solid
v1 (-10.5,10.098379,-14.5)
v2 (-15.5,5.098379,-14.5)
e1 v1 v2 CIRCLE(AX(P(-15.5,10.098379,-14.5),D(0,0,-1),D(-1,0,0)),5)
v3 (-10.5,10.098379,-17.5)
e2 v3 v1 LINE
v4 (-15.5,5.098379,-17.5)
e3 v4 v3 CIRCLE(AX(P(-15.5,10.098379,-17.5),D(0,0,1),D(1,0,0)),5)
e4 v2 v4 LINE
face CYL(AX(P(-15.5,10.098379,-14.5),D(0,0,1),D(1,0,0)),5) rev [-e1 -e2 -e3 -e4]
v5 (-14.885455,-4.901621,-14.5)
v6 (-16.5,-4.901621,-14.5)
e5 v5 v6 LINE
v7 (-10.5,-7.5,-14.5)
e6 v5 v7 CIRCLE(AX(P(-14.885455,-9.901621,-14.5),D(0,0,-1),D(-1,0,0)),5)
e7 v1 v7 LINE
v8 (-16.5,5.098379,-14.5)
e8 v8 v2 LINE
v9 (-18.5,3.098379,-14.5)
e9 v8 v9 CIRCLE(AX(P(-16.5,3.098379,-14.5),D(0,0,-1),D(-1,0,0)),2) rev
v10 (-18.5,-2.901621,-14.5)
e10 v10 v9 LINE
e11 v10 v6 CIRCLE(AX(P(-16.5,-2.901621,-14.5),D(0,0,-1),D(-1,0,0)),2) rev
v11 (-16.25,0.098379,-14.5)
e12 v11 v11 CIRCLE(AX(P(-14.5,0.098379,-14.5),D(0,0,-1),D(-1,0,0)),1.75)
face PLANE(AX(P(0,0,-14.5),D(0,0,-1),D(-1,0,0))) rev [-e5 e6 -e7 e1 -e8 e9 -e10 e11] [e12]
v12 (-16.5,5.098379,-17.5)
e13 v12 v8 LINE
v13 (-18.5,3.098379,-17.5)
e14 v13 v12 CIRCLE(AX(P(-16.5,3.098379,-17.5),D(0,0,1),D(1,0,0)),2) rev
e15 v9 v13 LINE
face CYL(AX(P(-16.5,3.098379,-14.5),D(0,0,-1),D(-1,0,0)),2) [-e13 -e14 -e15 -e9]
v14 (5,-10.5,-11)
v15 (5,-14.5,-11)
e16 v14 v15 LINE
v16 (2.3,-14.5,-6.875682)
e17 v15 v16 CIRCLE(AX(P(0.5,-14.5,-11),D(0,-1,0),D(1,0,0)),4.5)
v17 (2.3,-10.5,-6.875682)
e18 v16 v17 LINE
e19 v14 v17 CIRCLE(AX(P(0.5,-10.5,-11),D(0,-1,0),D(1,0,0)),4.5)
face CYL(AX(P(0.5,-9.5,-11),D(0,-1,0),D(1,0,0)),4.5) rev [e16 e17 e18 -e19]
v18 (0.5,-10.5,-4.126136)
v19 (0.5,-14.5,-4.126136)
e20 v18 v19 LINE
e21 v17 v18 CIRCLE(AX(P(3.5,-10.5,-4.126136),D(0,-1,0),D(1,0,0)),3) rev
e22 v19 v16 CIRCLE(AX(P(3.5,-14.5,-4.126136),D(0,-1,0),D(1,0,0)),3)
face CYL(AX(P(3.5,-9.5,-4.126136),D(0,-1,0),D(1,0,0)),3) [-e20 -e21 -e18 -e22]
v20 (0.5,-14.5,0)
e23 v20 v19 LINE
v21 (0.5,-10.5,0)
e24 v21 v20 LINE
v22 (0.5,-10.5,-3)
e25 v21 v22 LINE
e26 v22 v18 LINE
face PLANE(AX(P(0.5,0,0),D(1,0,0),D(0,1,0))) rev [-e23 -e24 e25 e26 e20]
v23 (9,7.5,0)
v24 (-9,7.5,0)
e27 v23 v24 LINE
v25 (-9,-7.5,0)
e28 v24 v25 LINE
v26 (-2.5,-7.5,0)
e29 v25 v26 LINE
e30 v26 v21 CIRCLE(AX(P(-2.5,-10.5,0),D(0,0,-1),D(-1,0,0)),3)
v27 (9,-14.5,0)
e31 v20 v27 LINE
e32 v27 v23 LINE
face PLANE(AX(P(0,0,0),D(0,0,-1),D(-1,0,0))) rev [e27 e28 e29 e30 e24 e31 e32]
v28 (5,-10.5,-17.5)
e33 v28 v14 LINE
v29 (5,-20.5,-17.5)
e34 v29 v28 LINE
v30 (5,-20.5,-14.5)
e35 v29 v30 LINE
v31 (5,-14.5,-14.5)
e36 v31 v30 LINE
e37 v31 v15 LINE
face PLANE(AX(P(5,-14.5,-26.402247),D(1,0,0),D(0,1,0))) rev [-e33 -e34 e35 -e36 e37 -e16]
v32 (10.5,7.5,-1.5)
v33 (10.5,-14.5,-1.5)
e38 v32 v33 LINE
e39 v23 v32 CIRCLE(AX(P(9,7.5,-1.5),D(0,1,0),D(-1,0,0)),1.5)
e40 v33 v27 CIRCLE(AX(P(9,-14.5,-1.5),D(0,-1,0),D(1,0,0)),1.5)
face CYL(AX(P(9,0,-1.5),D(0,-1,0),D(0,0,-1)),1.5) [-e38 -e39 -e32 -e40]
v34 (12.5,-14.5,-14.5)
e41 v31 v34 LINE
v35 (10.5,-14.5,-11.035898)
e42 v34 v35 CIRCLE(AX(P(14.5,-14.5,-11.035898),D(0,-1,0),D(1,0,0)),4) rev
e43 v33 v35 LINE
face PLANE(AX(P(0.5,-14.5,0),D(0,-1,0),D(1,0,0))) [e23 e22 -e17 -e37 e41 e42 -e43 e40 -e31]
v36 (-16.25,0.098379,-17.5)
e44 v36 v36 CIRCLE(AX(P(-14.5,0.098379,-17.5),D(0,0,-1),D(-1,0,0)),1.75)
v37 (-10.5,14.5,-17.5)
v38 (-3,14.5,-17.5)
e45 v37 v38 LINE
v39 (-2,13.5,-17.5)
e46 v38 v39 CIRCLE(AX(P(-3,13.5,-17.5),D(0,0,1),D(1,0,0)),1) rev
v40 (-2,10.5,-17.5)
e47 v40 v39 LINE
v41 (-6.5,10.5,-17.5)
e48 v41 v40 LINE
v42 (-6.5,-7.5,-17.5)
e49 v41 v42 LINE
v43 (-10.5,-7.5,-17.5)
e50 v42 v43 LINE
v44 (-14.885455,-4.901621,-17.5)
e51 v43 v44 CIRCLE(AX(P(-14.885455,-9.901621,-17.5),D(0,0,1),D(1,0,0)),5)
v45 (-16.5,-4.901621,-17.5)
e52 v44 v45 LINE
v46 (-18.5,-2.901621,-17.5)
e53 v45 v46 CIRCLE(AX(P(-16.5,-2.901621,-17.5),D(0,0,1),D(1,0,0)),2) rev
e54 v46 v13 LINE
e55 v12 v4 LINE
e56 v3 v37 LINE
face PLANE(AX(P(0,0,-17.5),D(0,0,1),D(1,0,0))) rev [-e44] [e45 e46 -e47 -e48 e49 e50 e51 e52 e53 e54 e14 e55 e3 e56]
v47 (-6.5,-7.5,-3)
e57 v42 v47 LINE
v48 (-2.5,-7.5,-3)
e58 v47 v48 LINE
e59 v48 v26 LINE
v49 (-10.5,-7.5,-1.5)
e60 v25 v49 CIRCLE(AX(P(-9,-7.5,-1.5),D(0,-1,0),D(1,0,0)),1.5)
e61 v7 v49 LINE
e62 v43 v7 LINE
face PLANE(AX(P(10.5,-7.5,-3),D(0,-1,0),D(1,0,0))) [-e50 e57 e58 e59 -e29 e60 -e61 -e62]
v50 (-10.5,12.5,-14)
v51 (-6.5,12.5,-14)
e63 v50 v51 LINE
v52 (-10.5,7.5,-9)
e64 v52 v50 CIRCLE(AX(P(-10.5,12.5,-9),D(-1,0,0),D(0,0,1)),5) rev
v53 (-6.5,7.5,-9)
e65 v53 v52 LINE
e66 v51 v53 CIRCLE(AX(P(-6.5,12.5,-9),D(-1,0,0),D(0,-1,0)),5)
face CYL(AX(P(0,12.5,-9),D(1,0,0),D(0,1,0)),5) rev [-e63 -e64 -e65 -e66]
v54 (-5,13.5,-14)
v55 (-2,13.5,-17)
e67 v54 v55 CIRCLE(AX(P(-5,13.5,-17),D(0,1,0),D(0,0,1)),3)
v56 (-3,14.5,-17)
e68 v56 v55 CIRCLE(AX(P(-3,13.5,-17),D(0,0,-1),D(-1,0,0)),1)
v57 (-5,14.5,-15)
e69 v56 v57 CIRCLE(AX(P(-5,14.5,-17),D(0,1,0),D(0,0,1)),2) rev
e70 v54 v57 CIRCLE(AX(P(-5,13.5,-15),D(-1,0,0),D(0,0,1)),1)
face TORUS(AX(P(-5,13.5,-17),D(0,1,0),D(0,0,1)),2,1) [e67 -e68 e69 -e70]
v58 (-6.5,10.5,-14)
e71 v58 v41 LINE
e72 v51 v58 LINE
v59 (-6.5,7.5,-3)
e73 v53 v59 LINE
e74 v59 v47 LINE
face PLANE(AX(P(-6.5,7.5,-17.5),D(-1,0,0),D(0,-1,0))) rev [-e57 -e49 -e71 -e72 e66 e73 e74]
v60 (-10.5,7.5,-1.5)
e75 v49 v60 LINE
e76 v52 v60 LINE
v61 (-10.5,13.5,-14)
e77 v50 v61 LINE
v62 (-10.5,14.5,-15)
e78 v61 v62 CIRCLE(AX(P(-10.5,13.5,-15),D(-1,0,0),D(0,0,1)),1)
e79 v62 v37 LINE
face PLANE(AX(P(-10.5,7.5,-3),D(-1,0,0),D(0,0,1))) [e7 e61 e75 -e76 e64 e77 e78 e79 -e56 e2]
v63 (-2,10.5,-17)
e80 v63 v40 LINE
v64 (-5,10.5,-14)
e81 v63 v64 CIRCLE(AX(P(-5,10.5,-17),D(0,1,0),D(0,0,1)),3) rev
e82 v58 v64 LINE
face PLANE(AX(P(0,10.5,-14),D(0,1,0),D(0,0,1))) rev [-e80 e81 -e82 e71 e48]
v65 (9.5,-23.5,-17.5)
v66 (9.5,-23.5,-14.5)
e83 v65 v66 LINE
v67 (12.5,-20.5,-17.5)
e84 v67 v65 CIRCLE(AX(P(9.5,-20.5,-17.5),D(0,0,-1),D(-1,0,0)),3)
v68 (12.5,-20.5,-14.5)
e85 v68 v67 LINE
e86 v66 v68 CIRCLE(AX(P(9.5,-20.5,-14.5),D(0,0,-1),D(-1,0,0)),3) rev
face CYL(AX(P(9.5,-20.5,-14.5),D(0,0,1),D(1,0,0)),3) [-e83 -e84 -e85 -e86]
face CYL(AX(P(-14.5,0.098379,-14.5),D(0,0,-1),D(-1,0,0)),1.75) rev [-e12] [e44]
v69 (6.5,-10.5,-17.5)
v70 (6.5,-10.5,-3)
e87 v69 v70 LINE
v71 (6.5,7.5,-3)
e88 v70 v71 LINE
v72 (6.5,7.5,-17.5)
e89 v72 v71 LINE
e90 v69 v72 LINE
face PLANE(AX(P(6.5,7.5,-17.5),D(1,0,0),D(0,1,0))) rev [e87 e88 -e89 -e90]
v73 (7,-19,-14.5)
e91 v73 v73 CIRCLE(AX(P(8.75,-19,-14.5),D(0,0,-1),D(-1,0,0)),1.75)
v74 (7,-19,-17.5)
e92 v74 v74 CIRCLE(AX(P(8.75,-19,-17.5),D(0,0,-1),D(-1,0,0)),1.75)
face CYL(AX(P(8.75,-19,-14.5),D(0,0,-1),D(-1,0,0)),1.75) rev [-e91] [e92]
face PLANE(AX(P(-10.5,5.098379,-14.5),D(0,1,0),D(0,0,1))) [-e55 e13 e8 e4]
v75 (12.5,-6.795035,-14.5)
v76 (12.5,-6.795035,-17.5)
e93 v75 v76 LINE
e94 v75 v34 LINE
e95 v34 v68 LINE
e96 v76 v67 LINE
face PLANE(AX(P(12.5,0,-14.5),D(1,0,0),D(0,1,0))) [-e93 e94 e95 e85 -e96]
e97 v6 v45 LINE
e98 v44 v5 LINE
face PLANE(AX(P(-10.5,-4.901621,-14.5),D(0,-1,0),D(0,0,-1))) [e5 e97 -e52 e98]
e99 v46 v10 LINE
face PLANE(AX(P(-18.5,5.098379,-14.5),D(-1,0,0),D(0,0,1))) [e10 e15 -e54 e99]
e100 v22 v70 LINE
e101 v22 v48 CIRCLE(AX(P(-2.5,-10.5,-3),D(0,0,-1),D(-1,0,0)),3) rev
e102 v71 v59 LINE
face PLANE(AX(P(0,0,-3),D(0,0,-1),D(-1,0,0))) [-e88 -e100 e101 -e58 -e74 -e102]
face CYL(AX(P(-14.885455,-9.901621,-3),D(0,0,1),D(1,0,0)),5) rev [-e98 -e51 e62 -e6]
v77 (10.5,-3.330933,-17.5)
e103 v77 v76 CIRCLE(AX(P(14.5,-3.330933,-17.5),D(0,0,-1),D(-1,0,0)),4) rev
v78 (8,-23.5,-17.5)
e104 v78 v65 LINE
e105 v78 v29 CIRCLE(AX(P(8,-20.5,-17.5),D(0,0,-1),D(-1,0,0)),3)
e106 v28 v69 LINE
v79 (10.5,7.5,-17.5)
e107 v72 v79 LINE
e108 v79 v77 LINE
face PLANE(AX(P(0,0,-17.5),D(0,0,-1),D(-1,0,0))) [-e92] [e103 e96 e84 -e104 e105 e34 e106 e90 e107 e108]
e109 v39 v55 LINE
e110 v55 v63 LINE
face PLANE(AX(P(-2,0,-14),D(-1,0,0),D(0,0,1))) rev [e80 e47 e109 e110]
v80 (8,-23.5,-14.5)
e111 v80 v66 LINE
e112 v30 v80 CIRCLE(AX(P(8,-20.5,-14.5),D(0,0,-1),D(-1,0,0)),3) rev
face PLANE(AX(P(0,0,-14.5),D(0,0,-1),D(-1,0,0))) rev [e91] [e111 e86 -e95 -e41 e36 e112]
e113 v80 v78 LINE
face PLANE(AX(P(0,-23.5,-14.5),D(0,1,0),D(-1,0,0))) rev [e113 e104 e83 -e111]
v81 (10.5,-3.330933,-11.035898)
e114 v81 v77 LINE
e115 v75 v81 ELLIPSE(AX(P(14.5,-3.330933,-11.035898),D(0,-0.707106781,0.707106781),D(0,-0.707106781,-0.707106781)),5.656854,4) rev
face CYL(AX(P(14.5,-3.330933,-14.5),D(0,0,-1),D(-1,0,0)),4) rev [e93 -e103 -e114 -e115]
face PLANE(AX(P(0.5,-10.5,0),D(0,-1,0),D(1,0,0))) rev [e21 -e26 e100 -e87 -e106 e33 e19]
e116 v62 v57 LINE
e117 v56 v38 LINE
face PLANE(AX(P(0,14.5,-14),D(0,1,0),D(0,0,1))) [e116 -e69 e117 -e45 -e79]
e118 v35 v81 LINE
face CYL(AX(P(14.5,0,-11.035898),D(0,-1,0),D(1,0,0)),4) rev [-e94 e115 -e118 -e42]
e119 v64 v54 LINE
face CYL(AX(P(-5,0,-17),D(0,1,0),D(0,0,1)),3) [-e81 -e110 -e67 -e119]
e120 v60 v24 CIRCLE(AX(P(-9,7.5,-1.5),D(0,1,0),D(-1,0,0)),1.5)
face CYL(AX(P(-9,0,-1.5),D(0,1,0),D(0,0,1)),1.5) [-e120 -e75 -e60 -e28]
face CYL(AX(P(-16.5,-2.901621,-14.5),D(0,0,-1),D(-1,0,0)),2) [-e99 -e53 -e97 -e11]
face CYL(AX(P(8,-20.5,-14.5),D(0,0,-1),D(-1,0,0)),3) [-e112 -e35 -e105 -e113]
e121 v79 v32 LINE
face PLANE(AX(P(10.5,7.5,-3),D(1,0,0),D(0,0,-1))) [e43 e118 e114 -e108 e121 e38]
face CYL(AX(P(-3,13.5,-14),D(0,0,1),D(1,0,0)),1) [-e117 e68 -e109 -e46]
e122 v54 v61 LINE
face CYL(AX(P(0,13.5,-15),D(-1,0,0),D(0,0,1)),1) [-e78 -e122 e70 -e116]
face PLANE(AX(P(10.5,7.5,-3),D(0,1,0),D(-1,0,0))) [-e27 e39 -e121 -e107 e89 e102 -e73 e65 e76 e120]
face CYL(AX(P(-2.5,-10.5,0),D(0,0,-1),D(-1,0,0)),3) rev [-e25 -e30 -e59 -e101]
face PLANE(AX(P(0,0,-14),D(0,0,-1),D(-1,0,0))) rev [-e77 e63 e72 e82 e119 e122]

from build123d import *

# Parameters (mm, degrees)
SKETCH1_W           = 21
SKETCH1_H           = 15
BOSS_EXTRUDE1_DEPTH = 3
SKETCH2_W           = 4
SKETCH2_H           = 15
BOSS_EXTRUDE2_DEPTH = 14.5
SKETCH3_W           = 4
SKETCH3_H           = 7
SKETCH3_W_2         = 4.5
SKETCH3_H_2         = 4
BOSS_EXTRUDE3_DEPTH = 3.5
FILLET1_R           = 1
FILLET2_R           = 3
FILLET3_R           = 5
SKETCH4_W           = 8
SKETCH4_H           = 10
SKETCH4_R           = 1.75
BOSS_EXTRUDE4_DEPTH = 3
FILLET4_R           = 5
FILLET5_R           = 2
SKETCH7_W           = 8
SKETCH7_H           = 4
BOSS_EXTRUDE5_DEPTH = 10
SKETCH8_W           = 4
SKETCH8_H           = 3
BOSS_EXTRUDE6_DEPTH = 8
SKETCH9_R           = 4.5
CUT_EXTRUDE1_DEPTH  = 5
BOSS_EXTRUDE7_DEPTH = 6.5
SKETCH11_R          = 1.75
SKETCH11_W          = 2
SKETCH11_H          = 7.704965023
BOSS_EXTRUDE8_DEPTH = 3
FILLET6_R           = 4
FILLET7_START       = -17.5
FILLET7_DEPTH       = 3
FILLET7_START_2     = -14.5
FILLET7_2_DEPTH     = 3.464101615
FILLET7_START_3     = -6.795034977
FILLET7_3_DEPTH     = 4.795034977
FILLET8_R           = 3
FILLET9_R           = 3
FILLET10_R          = 1.5


with BuildPart() as part:
    # Sketch1 → Boss-Extrude1 (new body)
    with BuildSketch(Plane.XY):
        Rectangle(SKETCH1_W, SKETCH1_H)
    extrude(amount=-BOSS_EXTRUDE1_DEPTH)

    # Sketch2 → Boss-Extrude2 (add)
    with BuildSketch(Plane(origin=(0, 0, -3), x_dir=(-1, 0, 0), z_dir=(0, 0, -1))):
        with Locations((8.5, 0)):
            Rectangle(SKETCH2_W, SKETCH2_H)
        with Locations((-8.5, 0)):
            Rectangle(SKETCH2_W, SKETCH2_H)
    extrude(amount=BOSS_EXTRUDE2_DEPTH)

    # Sketch3 → Boss-Extrude3 (add)
    with BuildSketch(Plane(origin=(0, 0, -17.5), x_dir=(-1, 0, 0), z_dir=(0, 0, -1))):
        with Locations((8.5, 11)):
            Rectangle(SKETCH3_W, SKETCH3_H)
        with Locations((4.25, 12.5)):
            Rectangle(SKETCH3_W_2, SKETCH3_H_2)
    extrude(amount=-BOSS_EXTRUDE3_DEPTH)

    # Fillet1
    fillet1_edges = [part.edges().sort_by_distance(p)[0] for p in [
        (-6.25, 14.5, -14),
        (-2, 14.5, -15.75),
    ]]
    fillet(fillet1_edges, radius=FILLET1_R)

    # Fillet2
    # the kernel refuses this fillet: 3 mm, written as the material it takes off along each edge
    with BuildSketch(Plane(origin=(-5, 14.5, -17), x_dir=(0, 0, 1), z_dir=(-1, 0, 0))) as fillet2_piece_1:
        with BuildLine():
            CenterArc((2, -1), 1, 0, 90)
            Line((3, -1), (3, 0))
            Line((3, 0), (2, 0))
        make_face()
    revolve(axis=Axis((-5, 14.5, -17), (0, 1, 0)), revolution_arc=90, mode=Mode.SUBTRACT)
    with BuildSketch(Plane(origin=(-2, 14.5, -14), x_dir=(0, 0, -1), z_dir=(0, -1, 0))) as fillet2_piece_2:
        with BuildLine():
            CenterArc((FILLET2_R, -FILLET2_R), FILLET2_R, 90, 90)
            Line((0, -FILLET2_R), (0, 0))
            Line((0, 0), (FILLET2_R, 0))
        make_face()
    extrude(amount=11.5, mode=Mode.SUBTRACT)

    # Fillet3
    # the kernel refuses this fillet: 5 mm, written as the material it adds along each edge
    with BuildSketch(Plane(origin=(-10.5, 7.5, -14), x_dir=(0, 1, 0), z_dir=(1, 0, 0))) as fillet3_piece_1:
        with BuildLine():
            CenterArc((FILLET3_R, FILLET3_R), FILLET3_R, 180, 90)
            Line((0, FILLET3_R), (0, 0))
            Line((0, 0), (FILLET3_R, 0))
        make_face()
    extrude(amount=4)

    # Sketch4 → Boss-Extrude4 (add)
    with BuildSketch(Plane(origin=(0, 0, -17.5), x_dir=(-1, 0, 0), z_dir=(0, 0, -1))):
        with Locations((14.5, 0.098378943)):
            Rectangle(SKETCH4_W, SKETCH4_H)
        with Locations((14.5, 0.098378943)):
            Circle(SKETCH4_R, mode=Mode.SUBTRACT)
    extrude(amount=-BOSS_EXTRUDE4_DEPTH)

    # Fillet4
    # the kernel refuses this fillet: 5 mm, written as the material it adds along each edge
    with BuildSketch(Plane(origin=(-10.5, -4.901621057, -17.5), x_dir=(0, -1, 0), z_dir=(0, 0, 1))) as fillet4_piece_1:
        with BuildLine():
            CenterArc((5, -4.385455085), FILLET4_R, 118.706578905, 61.293421095)
            Line((0, -4.385455085), (0, 0))
            Line((0, 0), (2.598378943, 0))
        make_face()
    extrude(amount=3)
    with BuildSketch(Plane(origin=(-10.5, 5.098378943, -17.5), x_dir=(0, 1, 0), z_dir=(0, 0, 1))) as fillet4_piece_2:
        with BuildLine():
            CenterArc((FILLET4_R, FILLET4_R), FILLET4_R, 180, 90)
            Line((0, FILLET4_R), (0, 0))
            Line((0, 0), (FILLET4_R, 0))
        make_face()
    extrude(amount=3)

    # Fillet5
    fillet5_edges = [part.edges().sort_by_distance(p)[0] for p in [
        (-18.5, 5.098378943, -16),
        (-18.5, -4.901621057, -16),
    ]]
    fillet(fillet5_edges, radius=FILLET5_R)

    # Sketch7 → Boss-Extrude5 (add)
    with BuildSketch(Plane(origin=(10.5, 0, 0), x_dir=(0, 0, -1), z_dir=(1, 0, 0))):
        Polygon((3, -7.5), (0, -7.5), (0, -14.5), (3, -14.5), (3, -10.5), align=None)
        with Locations((7, -12.5)):
            Rectangle(SKETCH7_W, SKETCH7_H)
    extrude(amount=-BOSS_EXTRUDE5_DEPTH)

    # Sketch8 → Boss-Extrude6 (add)
    with BuildSketch(Plane(origin=(0, 0, -3), x_dir=(-1, 0, 0), z_dir=(0, 0, -1))):
        with Locations((-8.5, -9)):
            Rectangle(SKETCH8_W, SKETCH8_H)
    extrude(amount=BOSS_EXTRUDE6_DEPTH)

    # Sketch9 → Cut-Extrude1 (cut)
    with BuildSketch(Plane.XZ.offset(14.5)):
        with Locations((0.5, -11)):
            Circle(SKETCH9_R)
    extrude(amount=-CUT_EXTRUDE1_DEPTH, mode=Mode.SUBTRACT)

    # Sketch10 → Boss-Extrude7 (add)
    with BuildSketch(Plane(origin=(0, 0, -11), x_dir=(-1, 0, 0), z_dir=(0, 0, -1))):
        Polygon((-5, -14.5), (-5, -10.5), (-6.5, -10.5), (-6.5, -7.5), (-10.5, -7.5), (-10.5, -14.5), align=None)
    extrude(amount=BOSS_EXTRUDE7_DEPTH)

    # Sketch11 → Boss-Extrude8 (add)
    # profile 1 of 2: a face of its own
    with BuildSketch(Plane(origin=(0, 0, -17.5), x_dir=(-1, 0, 0), z_dir=(0, 0, -1))):
        Polygon((-5, -23.5), (-5, -14.5), (-10.5, -14.5), (-12.5, -14.5), (-12.5, -23.5), align=None)
        with Locations((-8.75, -19)):
            Circle(SKETCH11_R, mode=Mode.SUBTRACT)
    # profile 2 of 2: a face of its own
    with BuildSketch(Plane(origin=(0, 0, -17.5), x_dir=(-1, 0, 0), z_dir=(0, 0, -1))):
        with Locations((-11.5, -10.647517489)):
            Rectangle(SKETCH11_W, SKETCH11_H)
    extrude(amount=-BOSS_EXTRUDE8_DEPTH)

    # Fillet6
    # the kernel refuses this fillet: 4 mm, written as the material it adds along each edge
    with BuildSketch(Plane(origin=(10.5, -14.5, -14.5), x_dir=(0, 0, 1), z_dir=(0, 1, 0))) as fillet6_piece_1:
        with BuildLine():
            CenterArc((3.464101615, 4), FILLET6_R, 210, 60)
            Line((0, 2), (-0.069282032, 1.96))
            ThreePointArc((-0.069282032, 1.96), (-0.08, 1), (-0.08, 0))
            Line((-0.08, 0), (0, -0.08))
            Line((0, -0.08), (3.464101615, -0.08))
            Line((3.464101615, -0.08), (3.464101615, 0))
        make_face()
    extrude(amount=7.704965023)

    # Fillet7: read off the stored shape, not the designer's step
    # Fillet7 outline → Fillet7 (add)
    with BuildSketch(Plane.XY.offset(FILLET7_START)):
        with BuildLine():
            Line((10.5, -6.795034977), (12.5, -6.795034977))
            ThreePointArc((12.5, -6.795034977), (11.035898385, -5.330933362), (10.5, -3.330933362))
            Line((10.5, -3.330933362), (10.5, -6.795034977))
        make_face()
    extrude(amount=FILLET7_DEPTH)

    # Fillet7 2 outline → Fillet7 2 (add)
    with BuildSketch(Plane.XY.offset(FILLET7_START_2)):
        with BuildLine():
            Line((10.5, -6.795034977), (12.5, -6.795034977))
            ThreePointArc((12.5, -6.795034977), (11.035898385, -5.330933362), (10.5, -3.330933362))
            Line((10.5, -3.330933362), (10.5, -6.795034977))
        make_face()
    extrude(amount=FILLET7_2_DEPTH)

    # Fillet7 3 outline → Fillet7 3 (cut)
    with BuildSketch(Plane(origin=(0, 0, 0), x_dir=(1, 0, 0), z_dir=(0, 1, 0)).offset(FILLET7_START_3)):
        with BuildLine():
            ThreePointArc((12.5, 14.5), (11.035898385, 13.035898385), (10.5, 11.035898385))
            Line((10.5, 11.035898385), (14, 11.035898385))
            Line((14, 11.035898385), (14, 15.366025404))
            Line((14, 15.366025404), (12.5, 14.5))
        make_face()
    extrude(amount=FILLET7_3_DEPTH, mode=Mode.SUBTRACT)

    # Fillet8
    fillet8_edges = [part.edges().sort_by_distance(p)[0] for p in [
        (5, -23.5, -16),
        (12.5, -23.5, -16),
    ]]
    fillet(fillet8_edges, radius=FILLET8_R)

    # Fillet9
    fillet9_edges = [part.edges().sort_by_distance(p)[0] for p in [
        (0.5, -7.5, -1.5),
        (0.5, -12.5, -6.5),
    ]]
    fillet(fillet9_edges, radius=FILLET9_R)

    # Fillet10
    fillet10_edges = [part.edges().sort_by_distance(p)[0] for p in [
        (10.5, -3.5, 0),
        (-10.5, 0, 0),
    ]]
    fillet(fillet10_edges, radius=FILLET10_R)


solid = part.part
